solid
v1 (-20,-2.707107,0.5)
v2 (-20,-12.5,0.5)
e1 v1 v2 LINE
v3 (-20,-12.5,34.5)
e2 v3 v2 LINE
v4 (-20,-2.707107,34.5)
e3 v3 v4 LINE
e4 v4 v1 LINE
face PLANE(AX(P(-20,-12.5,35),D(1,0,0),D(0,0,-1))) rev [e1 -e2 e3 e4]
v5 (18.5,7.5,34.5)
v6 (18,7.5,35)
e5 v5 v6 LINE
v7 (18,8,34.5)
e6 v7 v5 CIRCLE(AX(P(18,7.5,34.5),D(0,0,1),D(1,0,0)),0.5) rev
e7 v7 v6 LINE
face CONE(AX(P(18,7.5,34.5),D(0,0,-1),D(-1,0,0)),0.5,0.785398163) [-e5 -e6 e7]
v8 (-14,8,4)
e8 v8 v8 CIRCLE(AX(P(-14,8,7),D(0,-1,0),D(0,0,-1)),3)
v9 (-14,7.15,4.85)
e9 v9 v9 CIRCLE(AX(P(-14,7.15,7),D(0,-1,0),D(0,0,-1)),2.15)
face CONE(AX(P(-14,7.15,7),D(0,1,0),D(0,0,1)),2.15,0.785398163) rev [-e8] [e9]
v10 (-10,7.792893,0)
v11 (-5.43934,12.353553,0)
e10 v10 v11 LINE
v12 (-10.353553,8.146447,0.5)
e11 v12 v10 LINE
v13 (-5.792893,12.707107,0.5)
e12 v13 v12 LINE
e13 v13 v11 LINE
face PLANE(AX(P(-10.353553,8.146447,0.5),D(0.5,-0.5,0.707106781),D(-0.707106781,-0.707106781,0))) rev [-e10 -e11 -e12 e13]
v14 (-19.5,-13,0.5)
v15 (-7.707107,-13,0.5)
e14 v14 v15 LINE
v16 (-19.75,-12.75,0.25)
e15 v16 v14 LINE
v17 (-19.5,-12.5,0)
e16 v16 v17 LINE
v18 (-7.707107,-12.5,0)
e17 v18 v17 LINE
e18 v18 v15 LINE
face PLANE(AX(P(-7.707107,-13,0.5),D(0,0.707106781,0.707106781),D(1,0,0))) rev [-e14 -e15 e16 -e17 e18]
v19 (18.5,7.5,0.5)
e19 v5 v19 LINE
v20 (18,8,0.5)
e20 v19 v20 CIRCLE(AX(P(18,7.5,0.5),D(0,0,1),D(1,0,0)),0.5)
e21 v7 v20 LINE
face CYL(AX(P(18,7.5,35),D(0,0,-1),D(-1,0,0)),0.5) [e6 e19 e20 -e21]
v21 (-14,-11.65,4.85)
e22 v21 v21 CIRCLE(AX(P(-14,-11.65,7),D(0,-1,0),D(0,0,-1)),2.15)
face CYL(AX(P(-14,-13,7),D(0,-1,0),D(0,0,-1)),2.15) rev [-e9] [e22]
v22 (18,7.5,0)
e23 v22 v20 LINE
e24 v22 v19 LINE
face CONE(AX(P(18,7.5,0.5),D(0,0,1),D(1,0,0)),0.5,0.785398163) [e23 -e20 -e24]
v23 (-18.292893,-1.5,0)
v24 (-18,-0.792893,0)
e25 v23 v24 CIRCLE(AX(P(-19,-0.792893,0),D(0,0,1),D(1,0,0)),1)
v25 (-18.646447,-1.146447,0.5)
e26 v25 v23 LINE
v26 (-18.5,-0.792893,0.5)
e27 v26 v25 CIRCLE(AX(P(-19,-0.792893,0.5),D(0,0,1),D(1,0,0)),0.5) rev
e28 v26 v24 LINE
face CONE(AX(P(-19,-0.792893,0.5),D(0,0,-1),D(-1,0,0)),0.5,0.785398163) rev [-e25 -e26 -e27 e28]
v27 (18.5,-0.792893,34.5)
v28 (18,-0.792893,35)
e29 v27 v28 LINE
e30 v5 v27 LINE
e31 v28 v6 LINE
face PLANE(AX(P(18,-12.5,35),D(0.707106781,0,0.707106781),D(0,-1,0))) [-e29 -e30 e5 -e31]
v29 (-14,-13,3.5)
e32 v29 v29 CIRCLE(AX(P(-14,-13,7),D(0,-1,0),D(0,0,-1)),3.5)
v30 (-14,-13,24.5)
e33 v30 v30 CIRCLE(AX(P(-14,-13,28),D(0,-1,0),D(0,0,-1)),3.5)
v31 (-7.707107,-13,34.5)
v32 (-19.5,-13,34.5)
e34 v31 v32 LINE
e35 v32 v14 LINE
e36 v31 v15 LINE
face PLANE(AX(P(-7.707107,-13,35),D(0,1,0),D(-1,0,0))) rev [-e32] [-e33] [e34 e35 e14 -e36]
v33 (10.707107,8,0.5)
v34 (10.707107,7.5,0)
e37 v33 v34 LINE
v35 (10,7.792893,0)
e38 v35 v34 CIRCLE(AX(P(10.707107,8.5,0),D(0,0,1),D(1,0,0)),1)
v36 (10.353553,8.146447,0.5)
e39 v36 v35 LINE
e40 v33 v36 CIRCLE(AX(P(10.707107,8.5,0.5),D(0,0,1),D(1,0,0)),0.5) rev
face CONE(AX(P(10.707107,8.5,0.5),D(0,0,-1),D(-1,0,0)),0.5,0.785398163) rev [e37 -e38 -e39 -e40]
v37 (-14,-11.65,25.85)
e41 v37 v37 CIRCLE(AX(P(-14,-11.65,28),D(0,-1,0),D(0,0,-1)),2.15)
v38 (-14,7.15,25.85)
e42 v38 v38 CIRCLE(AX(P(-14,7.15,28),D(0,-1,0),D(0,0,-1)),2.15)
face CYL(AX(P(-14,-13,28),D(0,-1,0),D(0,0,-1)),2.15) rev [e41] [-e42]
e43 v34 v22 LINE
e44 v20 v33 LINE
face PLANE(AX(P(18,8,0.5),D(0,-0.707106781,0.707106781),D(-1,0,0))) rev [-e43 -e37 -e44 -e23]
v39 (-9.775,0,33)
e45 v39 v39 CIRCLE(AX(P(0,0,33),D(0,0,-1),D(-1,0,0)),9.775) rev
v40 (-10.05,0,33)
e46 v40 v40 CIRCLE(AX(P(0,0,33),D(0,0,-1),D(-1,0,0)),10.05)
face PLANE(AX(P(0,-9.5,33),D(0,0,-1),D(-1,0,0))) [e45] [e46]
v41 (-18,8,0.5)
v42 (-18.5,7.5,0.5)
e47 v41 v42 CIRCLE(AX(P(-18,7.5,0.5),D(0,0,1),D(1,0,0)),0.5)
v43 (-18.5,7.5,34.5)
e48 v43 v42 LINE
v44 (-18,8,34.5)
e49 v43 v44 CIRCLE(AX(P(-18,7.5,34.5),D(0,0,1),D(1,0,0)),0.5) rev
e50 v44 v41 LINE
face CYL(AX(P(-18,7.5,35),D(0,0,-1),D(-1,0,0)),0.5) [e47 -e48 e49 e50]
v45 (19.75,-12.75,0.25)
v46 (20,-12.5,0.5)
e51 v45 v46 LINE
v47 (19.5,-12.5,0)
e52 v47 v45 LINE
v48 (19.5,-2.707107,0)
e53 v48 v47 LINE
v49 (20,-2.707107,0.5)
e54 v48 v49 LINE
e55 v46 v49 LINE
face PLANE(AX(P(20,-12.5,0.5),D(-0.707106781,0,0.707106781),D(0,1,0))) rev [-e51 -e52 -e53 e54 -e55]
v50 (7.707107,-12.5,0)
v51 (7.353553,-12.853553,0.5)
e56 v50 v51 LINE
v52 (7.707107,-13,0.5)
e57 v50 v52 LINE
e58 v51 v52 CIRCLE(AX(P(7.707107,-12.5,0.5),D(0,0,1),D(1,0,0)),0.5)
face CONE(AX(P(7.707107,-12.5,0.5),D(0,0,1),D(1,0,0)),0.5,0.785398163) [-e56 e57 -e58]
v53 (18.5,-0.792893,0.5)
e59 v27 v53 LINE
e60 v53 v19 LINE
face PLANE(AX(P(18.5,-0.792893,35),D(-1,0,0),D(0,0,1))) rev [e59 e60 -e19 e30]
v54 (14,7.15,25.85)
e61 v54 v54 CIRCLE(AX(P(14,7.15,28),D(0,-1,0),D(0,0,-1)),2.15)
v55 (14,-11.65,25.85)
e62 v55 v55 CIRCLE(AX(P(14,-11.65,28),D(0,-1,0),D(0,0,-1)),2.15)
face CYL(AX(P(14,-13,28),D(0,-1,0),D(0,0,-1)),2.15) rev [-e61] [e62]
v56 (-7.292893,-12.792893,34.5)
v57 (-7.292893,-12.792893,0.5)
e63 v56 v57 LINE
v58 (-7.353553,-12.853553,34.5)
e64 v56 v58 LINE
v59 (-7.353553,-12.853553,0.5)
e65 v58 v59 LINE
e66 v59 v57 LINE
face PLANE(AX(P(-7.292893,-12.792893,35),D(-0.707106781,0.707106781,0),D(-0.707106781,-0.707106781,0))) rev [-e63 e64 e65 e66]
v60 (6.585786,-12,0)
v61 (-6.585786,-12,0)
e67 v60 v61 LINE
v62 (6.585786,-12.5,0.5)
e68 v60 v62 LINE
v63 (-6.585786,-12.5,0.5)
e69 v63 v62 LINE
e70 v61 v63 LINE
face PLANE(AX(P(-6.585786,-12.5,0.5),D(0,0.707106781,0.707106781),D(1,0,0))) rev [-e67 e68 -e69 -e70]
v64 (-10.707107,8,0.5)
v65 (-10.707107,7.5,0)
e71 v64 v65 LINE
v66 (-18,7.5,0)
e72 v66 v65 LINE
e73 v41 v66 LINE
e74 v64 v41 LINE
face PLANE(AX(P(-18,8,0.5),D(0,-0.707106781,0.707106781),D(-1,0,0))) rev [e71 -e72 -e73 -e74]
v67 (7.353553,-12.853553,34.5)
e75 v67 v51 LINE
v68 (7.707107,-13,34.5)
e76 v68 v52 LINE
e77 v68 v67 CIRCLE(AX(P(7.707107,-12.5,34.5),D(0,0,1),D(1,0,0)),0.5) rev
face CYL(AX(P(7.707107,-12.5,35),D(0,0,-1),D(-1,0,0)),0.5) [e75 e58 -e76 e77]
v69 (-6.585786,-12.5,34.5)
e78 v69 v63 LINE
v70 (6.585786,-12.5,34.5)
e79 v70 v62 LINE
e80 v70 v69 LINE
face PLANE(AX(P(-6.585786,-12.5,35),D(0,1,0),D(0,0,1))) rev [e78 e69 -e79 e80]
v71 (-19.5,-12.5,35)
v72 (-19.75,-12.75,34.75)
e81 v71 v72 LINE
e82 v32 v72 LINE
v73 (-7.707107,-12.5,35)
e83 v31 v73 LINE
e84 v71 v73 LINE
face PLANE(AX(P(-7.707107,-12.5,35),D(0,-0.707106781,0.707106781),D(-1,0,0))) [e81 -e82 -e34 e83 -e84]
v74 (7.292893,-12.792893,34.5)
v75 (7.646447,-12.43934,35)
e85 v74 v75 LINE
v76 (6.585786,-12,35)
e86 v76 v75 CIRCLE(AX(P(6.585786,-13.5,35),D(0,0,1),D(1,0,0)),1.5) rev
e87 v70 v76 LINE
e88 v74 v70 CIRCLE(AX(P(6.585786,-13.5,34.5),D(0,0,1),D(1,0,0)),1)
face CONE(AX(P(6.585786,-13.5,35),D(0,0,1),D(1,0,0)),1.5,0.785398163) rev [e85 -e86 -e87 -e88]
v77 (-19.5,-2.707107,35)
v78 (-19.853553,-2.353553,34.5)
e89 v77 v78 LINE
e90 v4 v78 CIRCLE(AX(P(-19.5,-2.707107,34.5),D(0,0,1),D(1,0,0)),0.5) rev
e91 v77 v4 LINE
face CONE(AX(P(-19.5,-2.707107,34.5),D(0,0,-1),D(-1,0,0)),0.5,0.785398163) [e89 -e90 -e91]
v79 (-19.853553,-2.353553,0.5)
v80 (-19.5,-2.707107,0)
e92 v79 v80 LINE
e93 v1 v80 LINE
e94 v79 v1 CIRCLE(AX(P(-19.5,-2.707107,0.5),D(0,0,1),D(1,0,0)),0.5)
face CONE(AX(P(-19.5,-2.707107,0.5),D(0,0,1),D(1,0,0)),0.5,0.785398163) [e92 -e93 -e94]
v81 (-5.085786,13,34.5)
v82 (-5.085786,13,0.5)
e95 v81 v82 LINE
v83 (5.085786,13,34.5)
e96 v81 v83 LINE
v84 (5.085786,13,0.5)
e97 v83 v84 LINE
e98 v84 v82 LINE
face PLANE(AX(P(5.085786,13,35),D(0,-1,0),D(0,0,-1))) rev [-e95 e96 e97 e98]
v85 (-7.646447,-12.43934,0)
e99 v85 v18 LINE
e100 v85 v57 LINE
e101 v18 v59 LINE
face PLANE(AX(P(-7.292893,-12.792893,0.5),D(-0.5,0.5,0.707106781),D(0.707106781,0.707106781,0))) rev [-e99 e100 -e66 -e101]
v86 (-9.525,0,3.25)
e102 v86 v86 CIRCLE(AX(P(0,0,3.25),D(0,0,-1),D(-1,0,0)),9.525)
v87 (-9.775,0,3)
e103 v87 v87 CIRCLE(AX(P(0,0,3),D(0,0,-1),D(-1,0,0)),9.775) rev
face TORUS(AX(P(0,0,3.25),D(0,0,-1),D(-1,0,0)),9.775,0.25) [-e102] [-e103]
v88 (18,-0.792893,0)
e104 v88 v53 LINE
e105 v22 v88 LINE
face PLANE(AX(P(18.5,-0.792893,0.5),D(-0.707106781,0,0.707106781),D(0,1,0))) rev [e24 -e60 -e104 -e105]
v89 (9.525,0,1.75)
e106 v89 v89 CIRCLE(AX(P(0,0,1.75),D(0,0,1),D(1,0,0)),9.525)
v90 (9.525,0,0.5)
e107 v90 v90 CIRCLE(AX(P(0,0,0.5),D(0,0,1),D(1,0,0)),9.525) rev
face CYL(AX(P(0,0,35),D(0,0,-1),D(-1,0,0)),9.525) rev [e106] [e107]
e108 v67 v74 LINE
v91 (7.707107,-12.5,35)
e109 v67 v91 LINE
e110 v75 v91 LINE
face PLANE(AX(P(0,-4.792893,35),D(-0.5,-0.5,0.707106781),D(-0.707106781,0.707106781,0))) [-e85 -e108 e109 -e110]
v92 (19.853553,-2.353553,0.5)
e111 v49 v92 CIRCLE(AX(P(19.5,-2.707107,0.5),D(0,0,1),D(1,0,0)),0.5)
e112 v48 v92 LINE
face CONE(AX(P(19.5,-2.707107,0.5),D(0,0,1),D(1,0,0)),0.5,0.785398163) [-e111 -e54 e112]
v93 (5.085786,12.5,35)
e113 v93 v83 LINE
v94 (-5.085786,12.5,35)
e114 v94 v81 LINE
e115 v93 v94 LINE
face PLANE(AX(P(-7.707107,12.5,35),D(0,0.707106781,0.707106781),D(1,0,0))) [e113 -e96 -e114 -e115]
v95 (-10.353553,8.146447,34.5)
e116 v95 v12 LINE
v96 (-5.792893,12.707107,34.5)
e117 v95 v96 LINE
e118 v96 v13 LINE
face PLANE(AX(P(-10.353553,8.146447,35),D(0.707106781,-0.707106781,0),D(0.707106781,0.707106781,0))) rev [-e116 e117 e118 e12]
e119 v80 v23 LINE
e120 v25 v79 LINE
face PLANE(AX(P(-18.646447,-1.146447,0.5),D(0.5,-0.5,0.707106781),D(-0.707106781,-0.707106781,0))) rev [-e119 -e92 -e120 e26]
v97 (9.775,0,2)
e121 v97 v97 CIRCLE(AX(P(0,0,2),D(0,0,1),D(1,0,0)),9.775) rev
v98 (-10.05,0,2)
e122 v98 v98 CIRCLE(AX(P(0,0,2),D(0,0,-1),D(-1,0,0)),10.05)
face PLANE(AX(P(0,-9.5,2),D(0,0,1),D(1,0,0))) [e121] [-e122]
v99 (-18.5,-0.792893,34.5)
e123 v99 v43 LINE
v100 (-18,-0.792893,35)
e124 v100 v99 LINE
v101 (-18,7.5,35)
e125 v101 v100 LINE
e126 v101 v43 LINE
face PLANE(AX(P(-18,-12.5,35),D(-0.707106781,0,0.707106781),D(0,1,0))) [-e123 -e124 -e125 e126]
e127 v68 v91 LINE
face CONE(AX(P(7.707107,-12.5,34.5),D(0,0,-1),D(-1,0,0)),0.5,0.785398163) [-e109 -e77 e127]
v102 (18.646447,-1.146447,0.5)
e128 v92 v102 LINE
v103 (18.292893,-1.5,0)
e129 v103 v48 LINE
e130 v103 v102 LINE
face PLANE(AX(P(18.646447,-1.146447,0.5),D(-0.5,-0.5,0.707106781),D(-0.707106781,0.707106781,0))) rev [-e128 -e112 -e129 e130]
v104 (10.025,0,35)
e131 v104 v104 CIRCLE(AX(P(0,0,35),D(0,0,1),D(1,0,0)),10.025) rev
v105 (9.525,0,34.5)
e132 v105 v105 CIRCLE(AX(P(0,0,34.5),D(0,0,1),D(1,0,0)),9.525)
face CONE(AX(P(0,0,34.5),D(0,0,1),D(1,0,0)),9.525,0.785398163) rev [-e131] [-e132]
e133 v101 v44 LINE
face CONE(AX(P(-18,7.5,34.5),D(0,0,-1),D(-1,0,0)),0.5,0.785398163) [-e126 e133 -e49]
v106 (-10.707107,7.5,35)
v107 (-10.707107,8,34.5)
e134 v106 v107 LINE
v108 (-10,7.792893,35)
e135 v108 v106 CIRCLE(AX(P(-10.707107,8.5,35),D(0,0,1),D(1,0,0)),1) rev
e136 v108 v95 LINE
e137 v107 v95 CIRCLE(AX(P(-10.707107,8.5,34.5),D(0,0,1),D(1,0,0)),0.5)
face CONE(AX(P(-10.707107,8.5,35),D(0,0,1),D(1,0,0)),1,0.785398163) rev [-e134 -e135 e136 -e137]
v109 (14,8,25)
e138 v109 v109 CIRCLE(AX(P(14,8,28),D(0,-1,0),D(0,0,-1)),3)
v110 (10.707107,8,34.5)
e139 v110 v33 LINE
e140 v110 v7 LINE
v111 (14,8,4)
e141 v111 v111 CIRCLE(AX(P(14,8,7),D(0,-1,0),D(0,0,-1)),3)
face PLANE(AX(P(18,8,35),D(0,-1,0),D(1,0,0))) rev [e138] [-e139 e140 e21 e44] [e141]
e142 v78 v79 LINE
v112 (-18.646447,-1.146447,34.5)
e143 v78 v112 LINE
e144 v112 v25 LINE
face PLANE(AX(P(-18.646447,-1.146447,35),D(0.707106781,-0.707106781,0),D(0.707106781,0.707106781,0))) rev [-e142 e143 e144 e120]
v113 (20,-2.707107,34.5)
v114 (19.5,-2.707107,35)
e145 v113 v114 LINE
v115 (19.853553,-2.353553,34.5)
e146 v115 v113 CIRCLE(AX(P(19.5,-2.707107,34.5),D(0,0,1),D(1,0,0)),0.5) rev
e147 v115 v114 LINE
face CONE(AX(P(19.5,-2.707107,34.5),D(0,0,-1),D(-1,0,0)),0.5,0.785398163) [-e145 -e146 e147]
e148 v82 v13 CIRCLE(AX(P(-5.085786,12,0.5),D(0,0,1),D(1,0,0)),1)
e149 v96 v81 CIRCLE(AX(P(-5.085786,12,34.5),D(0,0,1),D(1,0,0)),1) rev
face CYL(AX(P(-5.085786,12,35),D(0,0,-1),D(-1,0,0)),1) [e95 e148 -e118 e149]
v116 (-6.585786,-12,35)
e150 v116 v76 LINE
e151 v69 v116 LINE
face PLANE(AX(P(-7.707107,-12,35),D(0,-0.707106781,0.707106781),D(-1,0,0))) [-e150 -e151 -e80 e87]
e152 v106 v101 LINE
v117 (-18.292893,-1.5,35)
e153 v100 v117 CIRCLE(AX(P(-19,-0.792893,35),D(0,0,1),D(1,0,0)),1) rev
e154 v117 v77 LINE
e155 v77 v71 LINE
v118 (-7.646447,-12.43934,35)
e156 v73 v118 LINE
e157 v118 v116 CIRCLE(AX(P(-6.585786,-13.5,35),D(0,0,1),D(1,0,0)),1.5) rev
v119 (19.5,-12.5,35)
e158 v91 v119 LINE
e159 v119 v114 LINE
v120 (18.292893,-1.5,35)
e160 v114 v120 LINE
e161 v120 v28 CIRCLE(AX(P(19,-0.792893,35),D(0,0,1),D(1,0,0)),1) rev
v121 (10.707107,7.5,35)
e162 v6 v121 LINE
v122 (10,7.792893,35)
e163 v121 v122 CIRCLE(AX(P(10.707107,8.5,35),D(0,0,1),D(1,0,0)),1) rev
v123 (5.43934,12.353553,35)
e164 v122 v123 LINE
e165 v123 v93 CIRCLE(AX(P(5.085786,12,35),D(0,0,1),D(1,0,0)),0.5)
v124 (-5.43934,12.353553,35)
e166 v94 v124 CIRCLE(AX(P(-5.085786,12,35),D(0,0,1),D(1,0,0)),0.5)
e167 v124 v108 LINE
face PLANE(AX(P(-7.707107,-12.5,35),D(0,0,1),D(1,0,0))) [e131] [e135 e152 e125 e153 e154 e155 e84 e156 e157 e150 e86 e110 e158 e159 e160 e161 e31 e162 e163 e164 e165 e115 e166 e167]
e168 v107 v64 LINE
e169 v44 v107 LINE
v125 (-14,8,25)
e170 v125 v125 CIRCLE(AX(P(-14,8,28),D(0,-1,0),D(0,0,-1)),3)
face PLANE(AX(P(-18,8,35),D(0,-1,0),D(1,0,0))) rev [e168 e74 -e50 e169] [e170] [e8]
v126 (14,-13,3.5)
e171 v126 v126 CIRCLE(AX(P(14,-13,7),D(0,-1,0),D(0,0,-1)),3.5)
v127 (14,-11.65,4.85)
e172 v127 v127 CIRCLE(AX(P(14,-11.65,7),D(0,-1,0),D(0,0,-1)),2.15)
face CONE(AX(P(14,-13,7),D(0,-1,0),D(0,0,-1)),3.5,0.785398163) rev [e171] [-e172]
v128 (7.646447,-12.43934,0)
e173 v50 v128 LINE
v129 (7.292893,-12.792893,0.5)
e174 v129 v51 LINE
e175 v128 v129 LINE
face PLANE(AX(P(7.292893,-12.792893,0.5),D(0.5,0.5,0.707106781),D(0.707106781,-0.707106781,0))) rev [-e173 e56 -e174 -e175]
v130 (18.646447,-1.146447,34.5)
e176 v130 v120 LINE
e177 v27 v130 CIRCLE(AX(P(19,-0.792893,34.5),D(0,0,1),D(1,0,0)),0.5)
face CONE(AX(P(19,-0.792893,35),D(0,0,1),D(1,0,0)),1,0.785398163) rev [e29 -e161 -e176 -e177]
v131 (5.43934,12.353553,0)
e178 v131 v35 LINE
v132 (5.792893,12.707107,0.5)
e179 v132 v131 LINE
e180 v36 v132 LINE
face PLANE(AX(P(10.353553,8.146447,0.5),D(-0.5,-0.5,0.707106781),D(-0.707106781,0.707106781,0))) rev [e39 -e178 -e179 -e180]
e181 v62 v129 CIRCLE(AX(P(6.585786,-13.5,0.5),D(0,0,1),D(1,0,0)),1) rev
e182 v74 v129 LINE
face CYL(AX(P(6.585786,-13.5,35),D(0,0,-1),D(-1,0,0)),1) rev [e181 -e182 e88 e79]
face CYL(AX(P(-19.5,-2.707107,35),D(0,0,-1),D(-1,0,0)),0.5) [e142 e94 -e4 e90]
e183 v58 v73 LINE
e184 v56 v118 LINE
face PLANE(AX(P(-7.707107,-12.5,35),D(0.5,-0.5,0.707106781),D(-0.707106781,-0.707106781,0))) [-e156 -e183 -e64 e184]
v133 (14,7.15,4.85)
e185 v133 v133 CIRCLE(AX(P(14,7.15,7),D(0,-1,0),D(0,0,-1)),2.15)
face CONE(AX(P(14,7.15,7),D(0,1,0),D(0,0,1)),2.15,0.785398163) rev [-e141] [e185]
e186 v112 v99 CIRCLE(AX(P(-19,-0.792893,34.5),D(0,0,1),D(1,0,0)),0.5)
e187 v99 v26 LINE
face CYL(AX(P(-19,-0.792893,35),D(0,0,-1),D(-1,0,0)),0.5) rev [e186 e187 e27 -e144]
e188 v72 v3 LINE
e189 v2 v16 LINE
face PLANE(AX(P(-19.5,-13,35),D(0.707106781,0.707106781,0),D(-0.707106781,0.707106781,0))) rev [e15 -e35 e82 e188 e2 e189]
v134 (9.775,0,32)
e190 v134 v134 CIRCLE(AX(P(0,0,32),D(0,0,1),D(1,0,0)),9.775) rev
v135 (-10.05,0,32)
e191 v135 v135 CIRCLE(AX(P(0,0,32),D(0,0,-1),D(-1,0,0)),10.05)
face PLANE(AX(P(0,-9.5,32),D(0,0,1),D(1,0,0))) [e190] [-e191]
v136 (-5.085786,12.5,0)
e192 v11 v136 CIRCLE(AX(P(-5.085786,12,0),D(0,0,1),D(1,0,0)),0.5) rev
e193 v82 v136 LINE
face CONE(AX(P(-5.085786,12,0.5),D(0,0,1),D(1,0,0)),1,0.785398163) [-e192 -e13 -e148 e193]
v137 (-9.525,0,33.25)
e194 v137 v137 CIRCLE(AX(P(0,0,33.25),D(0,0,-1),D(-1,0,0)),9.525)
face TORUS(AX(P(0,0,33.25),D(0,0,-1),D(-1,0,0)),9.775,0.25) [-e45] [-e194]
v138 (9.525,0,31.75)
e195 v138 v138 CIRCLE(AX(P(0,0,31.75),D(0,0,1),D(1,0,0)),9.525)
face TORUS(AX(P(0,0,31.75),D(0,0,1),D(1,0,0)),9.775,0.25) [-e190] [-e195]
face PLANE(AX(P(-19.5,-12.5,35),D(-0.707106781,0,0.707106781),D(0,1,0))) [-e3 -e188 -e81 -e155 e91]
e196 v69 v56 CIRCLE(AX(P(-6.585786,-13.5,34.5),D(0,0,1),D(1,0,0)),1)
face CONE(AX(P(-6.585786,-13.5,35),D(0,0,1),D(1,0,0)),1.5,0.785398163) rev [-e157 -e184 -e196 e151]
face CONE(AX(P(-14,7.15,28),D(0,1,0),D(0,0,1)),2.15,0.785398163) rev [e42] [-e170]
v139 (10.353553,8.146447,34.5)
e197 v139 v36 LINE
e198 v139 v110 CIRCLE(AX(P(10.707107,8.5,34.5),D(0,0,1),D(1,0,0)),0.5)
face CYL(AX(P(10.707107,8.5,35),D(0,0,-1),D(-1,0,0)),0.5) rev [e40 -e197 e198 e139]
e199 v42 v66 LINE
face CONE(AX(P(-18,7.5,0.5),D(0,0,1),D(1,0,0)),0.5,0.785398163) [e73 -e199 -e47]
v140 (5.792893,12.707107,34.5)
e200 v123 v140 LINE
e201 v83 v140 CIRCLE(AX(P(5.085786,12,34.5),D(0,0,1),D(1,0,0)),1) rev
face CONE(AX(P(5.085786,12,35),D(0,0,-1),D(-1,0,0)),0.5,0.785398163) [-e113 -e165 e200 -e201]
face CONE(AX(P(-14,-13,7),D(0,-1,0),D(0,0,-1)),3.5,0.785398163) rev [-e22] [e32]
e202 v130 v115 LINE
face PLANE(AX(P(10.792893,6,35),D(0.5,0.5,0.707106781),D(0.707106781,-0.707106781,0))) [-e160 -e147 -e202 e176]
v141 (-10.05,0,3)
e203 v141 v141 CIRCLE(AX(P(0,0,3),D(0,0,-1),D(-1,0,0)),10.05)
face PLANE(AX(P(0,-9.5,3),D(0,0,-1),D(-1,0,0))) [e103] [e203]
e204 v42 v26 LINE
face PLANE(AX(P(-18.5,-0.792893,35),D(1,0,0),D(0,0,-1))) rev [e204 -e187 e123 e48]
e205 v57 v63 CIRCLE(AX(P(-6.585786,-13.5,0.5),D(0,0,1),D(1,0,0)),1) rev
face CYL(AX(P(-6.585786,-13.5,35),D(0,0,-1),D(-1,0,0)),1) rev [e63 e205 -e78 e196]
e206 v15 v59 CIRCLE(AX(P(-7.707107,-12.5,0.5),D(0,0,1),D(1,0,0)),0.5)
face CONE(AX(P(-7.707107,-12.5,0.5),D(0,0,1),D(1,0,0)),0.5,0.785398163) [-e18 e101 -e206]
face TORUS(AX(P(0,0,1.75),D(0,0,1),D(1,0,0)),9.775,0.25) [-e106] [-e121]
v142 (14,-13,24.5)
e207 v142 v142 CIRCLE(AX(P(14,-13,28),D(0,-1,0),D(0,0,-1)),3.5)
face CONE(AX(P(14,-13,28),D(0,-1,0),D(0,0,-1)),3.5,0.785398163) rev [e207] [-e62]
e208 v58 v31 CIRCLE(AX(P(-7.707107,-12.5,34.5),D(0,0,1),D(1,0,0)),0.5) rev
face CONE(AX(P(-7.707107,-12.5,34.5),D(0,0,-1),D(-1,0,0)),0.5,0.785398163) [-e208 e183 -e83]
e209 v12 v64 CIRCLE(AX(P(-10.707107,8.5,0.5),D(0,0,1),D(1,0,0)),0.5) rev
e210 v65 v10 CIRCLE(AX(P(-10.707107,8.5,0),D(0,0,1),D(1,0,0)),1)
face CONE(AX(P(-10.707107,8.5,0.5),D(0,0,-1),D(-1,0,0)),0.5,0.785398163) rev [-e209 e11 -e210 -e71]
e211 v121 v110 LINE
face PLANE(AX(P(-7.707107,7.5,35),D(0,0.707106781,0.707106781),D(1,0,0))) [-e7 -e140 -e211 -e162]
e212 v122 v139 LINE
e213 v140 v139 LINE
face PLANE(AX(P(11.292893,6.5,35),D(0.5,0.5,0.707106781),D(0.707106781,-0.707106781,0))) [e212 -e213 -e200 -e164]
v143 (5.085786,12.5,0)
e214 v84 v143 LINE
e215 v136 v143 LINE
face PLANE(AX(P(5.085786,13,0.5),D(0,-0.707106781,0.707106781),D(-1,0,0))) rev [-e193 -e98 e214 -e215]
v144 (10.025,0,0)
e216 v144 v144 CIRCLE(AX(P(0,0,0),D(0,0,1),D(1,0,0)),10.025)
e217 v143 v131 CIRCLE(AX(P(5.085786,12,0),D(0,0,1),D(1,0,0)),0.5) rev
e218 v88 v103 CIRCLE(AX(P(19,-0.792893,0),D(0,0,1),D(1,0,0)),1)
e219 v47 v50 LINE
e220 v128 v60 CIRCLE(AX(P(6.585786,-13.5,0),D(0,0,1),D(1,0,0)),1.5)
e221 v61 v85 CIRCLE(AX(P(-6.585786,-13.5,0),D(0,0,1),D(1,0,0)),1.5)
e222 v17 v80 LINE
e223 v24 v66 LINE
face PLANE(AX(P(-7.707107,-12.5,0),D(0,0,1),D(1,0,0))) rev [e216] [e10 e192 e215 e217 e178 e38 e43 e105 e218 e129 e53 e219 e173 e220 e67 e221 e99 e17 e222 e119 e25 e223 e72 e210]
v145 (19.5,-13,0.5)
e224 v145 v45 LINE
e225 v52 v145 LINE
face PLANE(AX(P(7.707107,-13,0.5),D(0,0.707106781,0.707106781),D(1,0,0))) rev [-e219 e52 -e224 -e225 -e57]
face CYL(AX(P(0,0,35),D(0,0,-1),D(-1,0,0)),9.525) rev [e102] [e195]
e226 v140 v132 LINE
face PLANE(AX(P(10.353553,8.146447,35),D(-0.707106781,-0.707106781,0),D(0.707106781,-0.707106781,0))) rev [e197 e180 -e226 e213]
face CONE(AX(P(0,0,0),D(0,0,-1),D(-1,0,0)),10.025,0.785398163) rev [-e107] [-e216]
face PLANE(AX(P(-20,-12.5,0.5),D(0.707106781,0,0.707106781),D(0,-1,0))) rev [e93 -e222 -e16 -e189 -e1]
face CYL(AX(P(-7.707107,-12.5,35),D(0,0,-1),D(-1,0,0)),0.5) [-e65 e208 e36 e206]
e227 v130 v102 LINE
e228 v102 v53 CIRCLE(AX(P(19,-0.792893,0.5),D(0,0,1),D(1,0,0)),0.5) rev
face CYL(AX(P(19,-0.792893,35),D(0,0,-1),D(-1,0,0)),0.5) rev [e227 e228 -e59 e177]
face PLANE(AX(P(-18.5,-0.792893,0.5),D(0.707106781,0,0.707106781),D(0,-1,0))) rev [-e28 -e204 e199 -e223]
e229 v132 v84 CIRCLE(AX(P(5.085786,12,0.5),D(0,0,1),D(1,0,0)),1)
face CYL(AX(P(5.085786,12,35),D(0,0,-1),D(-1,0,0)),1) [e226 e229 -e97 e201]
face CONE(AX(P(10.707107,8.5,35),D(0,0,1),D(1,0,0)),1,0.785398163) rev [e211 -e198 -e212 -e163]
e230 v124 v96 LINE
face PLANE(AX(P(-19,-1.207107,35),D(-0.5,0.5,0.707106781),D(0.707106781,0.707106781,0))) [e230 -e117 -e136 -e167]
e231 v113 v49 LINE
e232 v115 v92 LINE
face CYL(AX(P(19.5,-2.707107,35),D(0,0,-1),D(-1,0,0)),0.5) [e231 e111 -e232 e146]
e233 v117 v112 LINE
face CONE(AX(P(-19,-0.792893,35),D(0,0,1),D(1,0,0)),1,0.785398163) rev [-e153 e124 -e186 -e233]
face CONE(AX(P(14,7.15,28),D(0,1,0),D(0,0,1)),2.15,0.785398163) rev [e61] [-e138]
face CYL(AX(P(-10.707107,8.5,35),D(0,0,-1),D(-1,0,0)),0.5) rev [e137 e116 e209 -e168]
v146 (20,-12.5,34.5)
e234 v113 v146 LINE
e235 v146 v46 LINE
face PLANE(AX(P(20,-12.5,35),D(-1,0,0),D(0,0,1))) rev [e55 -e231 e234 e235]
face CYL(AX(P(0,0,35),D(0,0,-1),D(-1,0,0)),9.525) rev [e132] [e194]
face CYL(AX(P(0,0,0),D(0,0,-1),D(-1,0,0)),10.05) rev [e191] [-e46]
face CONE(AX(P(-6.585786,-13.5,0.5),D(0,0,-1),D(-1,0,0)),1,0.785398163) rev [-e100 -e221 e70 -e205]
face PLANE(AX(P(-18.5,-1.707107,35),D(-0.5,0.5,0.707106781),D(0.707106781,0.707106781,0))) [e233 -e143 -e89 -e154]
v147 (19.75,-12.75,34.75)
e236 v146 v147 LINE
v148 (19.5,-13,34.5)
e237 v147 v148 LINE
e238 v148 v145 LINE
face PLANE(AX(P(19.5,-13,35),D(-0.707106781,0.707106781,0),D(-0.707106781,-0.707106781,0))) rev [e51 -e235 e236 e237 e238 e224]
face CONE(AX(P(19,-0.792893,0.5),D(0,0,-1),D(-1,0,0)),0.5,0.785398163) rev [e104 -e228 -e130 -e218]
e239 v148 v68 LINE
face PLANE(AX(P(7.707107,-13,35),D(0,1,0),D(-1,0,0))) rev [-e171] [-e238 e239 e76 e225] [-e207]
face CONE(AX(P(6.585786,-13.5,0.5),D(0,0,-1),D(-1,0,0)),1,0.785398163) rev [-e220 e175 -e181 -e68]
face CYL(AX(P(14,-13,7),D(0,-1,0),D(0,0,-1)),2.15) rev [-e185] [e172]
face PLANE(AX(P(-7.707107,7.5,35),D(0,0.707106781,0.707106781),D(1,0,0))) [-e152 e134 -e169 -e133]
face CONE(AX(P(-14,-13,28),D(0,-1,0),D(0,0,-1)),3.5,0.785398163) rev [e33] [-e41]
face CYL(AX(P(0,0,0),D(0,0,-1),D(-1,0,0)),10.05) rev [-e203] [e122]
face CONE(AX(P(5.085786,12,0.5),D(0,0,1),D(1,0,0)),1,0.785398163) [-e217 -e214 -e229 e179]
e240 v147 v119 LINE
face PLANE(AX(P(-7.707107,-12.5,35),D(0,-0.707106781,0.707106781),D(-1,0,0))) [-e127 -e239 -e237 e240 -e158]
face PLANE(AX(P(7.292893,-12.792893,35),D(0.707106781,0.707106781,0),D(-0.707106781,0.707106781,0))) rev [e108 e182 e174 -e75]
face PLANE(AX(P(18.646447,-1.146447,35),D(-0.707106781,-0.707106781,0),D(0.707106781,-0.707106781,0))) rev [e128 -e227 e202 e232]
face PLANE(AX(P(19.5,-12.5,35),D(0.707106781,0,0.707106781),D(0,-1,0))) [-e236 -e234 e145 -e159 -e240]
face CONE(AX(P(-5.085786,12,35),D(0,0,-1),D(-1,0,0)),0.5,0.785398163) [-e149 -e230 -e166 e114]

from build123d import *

# Parameters (mm, degrees)
SKETCH1_R                      = 9.525
BOSS_EXTRUDE1_DEPTH            = 35
CHAMFER2_SIZE                  = 0.5
SKETCH2_W                      = 1
SKETCH2_H                      = 0.55
FILLET2_R                      = 0.25
M5X0_8_TAPPED_HOLE1_AT_2_COUNT = 2
M5X0_8_TAPPED_HOLE1_AT_2_PITCH = 21
M5X0_8_TAPPED_HOLE1_AT_3_COUNT = 2
M5X0_8_TAPPED_HOLE1_AT_3_PITCH = 35
M5X0_8_TAPPED_HOLE1_AT_4_COUNT = 2
M5X0_8_TAPPED_HOLE1_AT_4_PITCH = 28
CHAMFER3_SIZE                  = 0.5


with BuildPart() as part:
    # Sketch1 → Boss-Extrude1 (new body)
    with BuildSketch(Plane.XY):
        with BuildLine():
            Line((18.646446609, -1.146446609), (19.853553391, -2.353553391))
            ThreePointArc((19.853553391, -2.353553391), (19.961939766, -2.515765065), (20, -2.707106781))
            Line((20, -2.707106781), (20, -12.5))
            Line((20, -12.5), (19.5, -13))
            Line((19.5, -13), (7.707106781, -13))
            ThreePointArc((7.707106781, -13), (7.515765065, -12.961939766), (7.353553391, -12.853553391))
            Line((7.353553391, -12.853553391), (7.292893219, -12.792893219))
            ThreePointArc((7.292893219, -12.792893219), (6.96846987, -12.576120467), (6.585786438, -12.5))
            Line((6.585786438, -12.5), (-6.585786438, -12.5))
            ThreePointArc((-6.585786438, -12.5), (-6.96846987, -12.576120467), (-7.292893219, -12.792893219))
            Line((-7.292893219, -12.792893219), (-7.353553391, -12.853553391))
            ThreePointArc((-7.353553391, -12.853553391), (-7.515765065, -12.961939766), (-7.707106781, -13))
            Line((-7.707106781, -13), (-19.5, -13))
            Line((-19.5, -13), (-20, -12.5))
            Line((-20, -12.5), (-20, -2.707106781))
            ThreePointArc((-20, -2.707106781), (-19.961939766, -2.515765065), (-19.853553391, -2.353553391))
            Line((-19.853553391, -2.353553391), (-18.646446609, -1.146446609))
            ThreePointArc((-18.646446609, -1.146446609), (-18.538060234, -0.984234935), (-18.5, -0.792893219))
            Line((-18.5, -0.792893219), (-18.5, 7.5))
            ThreePointArc((-18.5, 7.5), (-18.353553391, 7.853553391), (-18, 8))
            Line((-18, 8), (-10.707106781, 8))
            ThreePointArc((-10.707106781, 8), (-10.515765065, 8.038060234), (-10.353553391, 8.146446609))
            Line((-10.353553391, 8.146446609), (-5.792893219, 12.707106781))
            ThreePointArc((-5.792893219, 12.707106781), (-5.46846987, 12.923879533), (-5.085786438, 13))
            Line((-5.085786438, 13), (5.085786438, 13))
            ThreePointArc((5.085786438, 13), (5.46846987, 12.923879533), (5.792893219, 12.707106781))
            Line((5.792893219, 12.707106781), (10.353553391, 8.146446609))
            ThreePointArc((10.353553391, 8.146446609), (10.515765065, 8.038060234), (10.707106781, 8))
            Line((10.707106781, 8), (18, 8))
            ThreePointArc((18, 8), (18.353553391, 7.853553391), (18.5, 7.5))
            Line((18.5, 7.5), (18.5, -0.792893219))
            ThreePointArc((18.5, -0.792893219), (18.538060234, -0.984234935), (18.646446609, -1.146446609))
        make_face()
        with Locations(Location((0, 0, 0), (0, 0, 180))):
            Circle(SKETCH1_R, mode=Mode.SUBTRACT)
    extrude(amount=BOSS_EXTRUDE1_DEPTH)

    # Chamfer2
    chamfer2_edges = [part.edges().sort_by_distance(p)[0] for p in [
        (9.525, 0, 0),
        (9.525, 0, 35),
    ]]
    chamfer(chamfer2_edges, length=CHAMFER2_SIZE)

    # Sketch2 → Cut-Revolve1 (revolve, cut)
    with BuildSketch(Plane(origin=(0, 0, 0), x_dir=(0, 0, -1), z_dir=(1, 0, 0)), mode=Mode.PRIVATE) as cut_revolve1_sk:
        with Locations((-32.5, -9.775)):
            Rectangle(SKETCH2_W, SKETCH2_H)
        with Locations((-2.5, -9.775)):
            Rectangle(SKETCH2_W, SKETCH2_H)
    revolve(cut_revolve1_sk.sketch.rotate(Axis((0, 0, 0), (0, 0, 1)), 270), axis=Axis((0, 0, 0), (0, 0, 1)), mode=Mode.SUBTRACT)

    # Fillet2
    fillet2_edges = [part.edges().sort_by_distance(p)[0] for p in [
        (9.525, 0, 33),
        (9.525, 0, 32),
        (9.525, 0, 3),
        (9.525, 0, 2),
    ]]
    fillet(fillet2_edges, radius=FILLET2_R)

    # Sketch5 → M5x0.8 Tapped Hole1 (revolve, cut)
    with BuildSketch(Plane(origin=(-14, -13, 28), x_dir=(0, 0, -1), z_dir=(1, 0, 0))):
        Polygon((0, 0), (0, 21), (3, 21), (2.15, 20.15), (2.15, 1.35), (3.5, 0), align=None)
    m5x0_8_tapped_hole1 = revolve(axis=Axis((-14, -19.35, 28), (0, 1, 0)), mode=Mode.SUBTRACT)

    # M5x0.8 Tapped Hole1 at 2: M5x0.8 Tapped Hole1 ×2
    with Locations(*[(0, 0, -i * M5X0_8_TAPPED_HOLE1_AT_2_PITCH) for i in range(1, M5X0_8_TAPPED_HOLE1_AT_2_COUNT)]):
        add(m5x0_8_tapped_hole1, mode=Mode.SUBTRACT)

    # M5x0.8 Tapped Hole1 at 3: M5x0.8 Tapped Hole1 ×2
    with Locations(*[Vector(0.8, 0, -0.6) * (i * M5X0_8_TAPPED_HOLE1_AT_3_PITCH) for i in range(1, M5X0_8_TAPPED_HOLE1_AT_3_COUNT)]):
        add(m5x0_8_tapped_hole1, mode=Mode.SUBTRACT)

    # M5x0.8 Tapped Hole1 at 4: M5x0.8 Tapped Hole1 ×2
    with Locations(*[(i * M5X0_8_TAPPED_HOLE1_AT_4_PITCH, 0, 0) for i in range(1, M5X0_8_TAPPED_HOLE1_AT_4_COUNT)]):
        add(m5x0_8_tapped_hole1, mode=Mode.SUBTRACT)

    # Chamfer3
    chamfer3_edges = [part.edges().sort_by_distance(p)[0] for p in [
        (18.353553391, 7.853553391, 0),
        (18.5, 3.353553391, 0),
        (18.538060234, -0.984234935, 0),
        (19.25, -1.75, 0),
        (19.961939766, -2.515765065, 0),
        (20, -7.603553391, 0),
        (-20, -7.603553391, 0),
        (-19.961939766, -2.515765065, 0),
        (-19.25, -1.75, 0),
        (-18.538060234, -0.984234935, 0),
        (-18.5, 3.353553391, 0),
        (-18.353553391, 7.853553391, 0),
        (-14.353553391, 8, 0),
        (-10.515765065, 8.038060234, 0),
        (-8.073223305, 10.426776695, 0),
        (-5.46846987, 12.923879533, 0),
        (0, 13, 0),
        (5.46846987, 12.923879533, 0),
        (8.073223305, 10.426776695, 0),
        (10.515765065, 8.038060234, 0),
        (14.353553391, 8, 0),
    ]]
    chamfer(chamfer3_edges, length=CHAMFER3_SIZE - 0.0001)  # a hair under: the kernel refuses the full size
    chamfer3_2_edges = [part.edges().sort_by_distance(p)[0] for p in [
        (13.603553391, -13, 0),
        (7.515765065, -12.961939766, 0),
        (7.323223305, -12.823223305, 0),
        (6.96846987, -12.576120467, 0),
        (0, -12.5, 0),
        (-6.96846987, -12.576120467, 0),
        (-7.323223305, -12.823223305, 0),
        (-7.515765065, -12.961939766, 0),
        (-13.603553391, -13, 0),
    ]]
    chamfer(chamfer3_2_edges, length=CHAMFER3_SIZE - 0.0001)  # a hair under: the kernel refuses the full size
    chamfer3_3_edges = [part.edges().sort_by_distance(p)[0] for p in [
        (18.353553391, 7.853553391, 35),
        (18.5, 3.353553391, 35),
        (18.538060234, -0.984234935, 35),
        (19.25, -1.75, 35),
        (19.961939766, -2.515765065, 35),
        (20, -7.603553391, 35),
        (-20, -7.603553391, 35),
        (-19.961939766, -2.515765065, 35),
        (-19.25, -1.75, 35),
        (-18.538060234, -0.984234935, 35),
        (-18.5, 3.353553391, 35),
        (-18.353553391, 7.853553391, 35),
        (-14.353553391, 8, 35),
        (-10.515765065, 8.038060234, 35),
        (-8.073223305, 10.426776695, 35),
        (-5.46846987, 12.923879533, 35),
        (0, 13, 35),
        (5.46846987, 12.923879533, 35),
        (8.073223305, 10.426776695, 35),
        (10.515765065, 8.038060234, 35),
        (14.353553391, 8, 35),
    ]]
    chamfer(chamfer3_3_edges, length=CHAMFER3_SIZE - 0.0001)  # a hair under: the kernel refuses the full size
    chamfer3_4_edges = [part.edges().sort_by_distance(p)[0] for p in [
        (13.603553391, -13, 35),
        (7.515765065, -12.961939766, 35),
        (7.323223305, -12.823223305, 35),
        (6.96846987, -12.576120467, 35),
        (0, -12.5, 35),
        (-6.96846987, -12.576120467, 35),
        (-7.323223305, -12.823223305, 35),
        (-7.515765065, -12.961939766, 35),
        (-13.603553391, -13, 35),
    ]]
    chamfer(chamfer3_4_edges, length=CHAMFER3_SIZE - 0.0001)  # a hair under: the kernel refuses the full size


solid = part.part
